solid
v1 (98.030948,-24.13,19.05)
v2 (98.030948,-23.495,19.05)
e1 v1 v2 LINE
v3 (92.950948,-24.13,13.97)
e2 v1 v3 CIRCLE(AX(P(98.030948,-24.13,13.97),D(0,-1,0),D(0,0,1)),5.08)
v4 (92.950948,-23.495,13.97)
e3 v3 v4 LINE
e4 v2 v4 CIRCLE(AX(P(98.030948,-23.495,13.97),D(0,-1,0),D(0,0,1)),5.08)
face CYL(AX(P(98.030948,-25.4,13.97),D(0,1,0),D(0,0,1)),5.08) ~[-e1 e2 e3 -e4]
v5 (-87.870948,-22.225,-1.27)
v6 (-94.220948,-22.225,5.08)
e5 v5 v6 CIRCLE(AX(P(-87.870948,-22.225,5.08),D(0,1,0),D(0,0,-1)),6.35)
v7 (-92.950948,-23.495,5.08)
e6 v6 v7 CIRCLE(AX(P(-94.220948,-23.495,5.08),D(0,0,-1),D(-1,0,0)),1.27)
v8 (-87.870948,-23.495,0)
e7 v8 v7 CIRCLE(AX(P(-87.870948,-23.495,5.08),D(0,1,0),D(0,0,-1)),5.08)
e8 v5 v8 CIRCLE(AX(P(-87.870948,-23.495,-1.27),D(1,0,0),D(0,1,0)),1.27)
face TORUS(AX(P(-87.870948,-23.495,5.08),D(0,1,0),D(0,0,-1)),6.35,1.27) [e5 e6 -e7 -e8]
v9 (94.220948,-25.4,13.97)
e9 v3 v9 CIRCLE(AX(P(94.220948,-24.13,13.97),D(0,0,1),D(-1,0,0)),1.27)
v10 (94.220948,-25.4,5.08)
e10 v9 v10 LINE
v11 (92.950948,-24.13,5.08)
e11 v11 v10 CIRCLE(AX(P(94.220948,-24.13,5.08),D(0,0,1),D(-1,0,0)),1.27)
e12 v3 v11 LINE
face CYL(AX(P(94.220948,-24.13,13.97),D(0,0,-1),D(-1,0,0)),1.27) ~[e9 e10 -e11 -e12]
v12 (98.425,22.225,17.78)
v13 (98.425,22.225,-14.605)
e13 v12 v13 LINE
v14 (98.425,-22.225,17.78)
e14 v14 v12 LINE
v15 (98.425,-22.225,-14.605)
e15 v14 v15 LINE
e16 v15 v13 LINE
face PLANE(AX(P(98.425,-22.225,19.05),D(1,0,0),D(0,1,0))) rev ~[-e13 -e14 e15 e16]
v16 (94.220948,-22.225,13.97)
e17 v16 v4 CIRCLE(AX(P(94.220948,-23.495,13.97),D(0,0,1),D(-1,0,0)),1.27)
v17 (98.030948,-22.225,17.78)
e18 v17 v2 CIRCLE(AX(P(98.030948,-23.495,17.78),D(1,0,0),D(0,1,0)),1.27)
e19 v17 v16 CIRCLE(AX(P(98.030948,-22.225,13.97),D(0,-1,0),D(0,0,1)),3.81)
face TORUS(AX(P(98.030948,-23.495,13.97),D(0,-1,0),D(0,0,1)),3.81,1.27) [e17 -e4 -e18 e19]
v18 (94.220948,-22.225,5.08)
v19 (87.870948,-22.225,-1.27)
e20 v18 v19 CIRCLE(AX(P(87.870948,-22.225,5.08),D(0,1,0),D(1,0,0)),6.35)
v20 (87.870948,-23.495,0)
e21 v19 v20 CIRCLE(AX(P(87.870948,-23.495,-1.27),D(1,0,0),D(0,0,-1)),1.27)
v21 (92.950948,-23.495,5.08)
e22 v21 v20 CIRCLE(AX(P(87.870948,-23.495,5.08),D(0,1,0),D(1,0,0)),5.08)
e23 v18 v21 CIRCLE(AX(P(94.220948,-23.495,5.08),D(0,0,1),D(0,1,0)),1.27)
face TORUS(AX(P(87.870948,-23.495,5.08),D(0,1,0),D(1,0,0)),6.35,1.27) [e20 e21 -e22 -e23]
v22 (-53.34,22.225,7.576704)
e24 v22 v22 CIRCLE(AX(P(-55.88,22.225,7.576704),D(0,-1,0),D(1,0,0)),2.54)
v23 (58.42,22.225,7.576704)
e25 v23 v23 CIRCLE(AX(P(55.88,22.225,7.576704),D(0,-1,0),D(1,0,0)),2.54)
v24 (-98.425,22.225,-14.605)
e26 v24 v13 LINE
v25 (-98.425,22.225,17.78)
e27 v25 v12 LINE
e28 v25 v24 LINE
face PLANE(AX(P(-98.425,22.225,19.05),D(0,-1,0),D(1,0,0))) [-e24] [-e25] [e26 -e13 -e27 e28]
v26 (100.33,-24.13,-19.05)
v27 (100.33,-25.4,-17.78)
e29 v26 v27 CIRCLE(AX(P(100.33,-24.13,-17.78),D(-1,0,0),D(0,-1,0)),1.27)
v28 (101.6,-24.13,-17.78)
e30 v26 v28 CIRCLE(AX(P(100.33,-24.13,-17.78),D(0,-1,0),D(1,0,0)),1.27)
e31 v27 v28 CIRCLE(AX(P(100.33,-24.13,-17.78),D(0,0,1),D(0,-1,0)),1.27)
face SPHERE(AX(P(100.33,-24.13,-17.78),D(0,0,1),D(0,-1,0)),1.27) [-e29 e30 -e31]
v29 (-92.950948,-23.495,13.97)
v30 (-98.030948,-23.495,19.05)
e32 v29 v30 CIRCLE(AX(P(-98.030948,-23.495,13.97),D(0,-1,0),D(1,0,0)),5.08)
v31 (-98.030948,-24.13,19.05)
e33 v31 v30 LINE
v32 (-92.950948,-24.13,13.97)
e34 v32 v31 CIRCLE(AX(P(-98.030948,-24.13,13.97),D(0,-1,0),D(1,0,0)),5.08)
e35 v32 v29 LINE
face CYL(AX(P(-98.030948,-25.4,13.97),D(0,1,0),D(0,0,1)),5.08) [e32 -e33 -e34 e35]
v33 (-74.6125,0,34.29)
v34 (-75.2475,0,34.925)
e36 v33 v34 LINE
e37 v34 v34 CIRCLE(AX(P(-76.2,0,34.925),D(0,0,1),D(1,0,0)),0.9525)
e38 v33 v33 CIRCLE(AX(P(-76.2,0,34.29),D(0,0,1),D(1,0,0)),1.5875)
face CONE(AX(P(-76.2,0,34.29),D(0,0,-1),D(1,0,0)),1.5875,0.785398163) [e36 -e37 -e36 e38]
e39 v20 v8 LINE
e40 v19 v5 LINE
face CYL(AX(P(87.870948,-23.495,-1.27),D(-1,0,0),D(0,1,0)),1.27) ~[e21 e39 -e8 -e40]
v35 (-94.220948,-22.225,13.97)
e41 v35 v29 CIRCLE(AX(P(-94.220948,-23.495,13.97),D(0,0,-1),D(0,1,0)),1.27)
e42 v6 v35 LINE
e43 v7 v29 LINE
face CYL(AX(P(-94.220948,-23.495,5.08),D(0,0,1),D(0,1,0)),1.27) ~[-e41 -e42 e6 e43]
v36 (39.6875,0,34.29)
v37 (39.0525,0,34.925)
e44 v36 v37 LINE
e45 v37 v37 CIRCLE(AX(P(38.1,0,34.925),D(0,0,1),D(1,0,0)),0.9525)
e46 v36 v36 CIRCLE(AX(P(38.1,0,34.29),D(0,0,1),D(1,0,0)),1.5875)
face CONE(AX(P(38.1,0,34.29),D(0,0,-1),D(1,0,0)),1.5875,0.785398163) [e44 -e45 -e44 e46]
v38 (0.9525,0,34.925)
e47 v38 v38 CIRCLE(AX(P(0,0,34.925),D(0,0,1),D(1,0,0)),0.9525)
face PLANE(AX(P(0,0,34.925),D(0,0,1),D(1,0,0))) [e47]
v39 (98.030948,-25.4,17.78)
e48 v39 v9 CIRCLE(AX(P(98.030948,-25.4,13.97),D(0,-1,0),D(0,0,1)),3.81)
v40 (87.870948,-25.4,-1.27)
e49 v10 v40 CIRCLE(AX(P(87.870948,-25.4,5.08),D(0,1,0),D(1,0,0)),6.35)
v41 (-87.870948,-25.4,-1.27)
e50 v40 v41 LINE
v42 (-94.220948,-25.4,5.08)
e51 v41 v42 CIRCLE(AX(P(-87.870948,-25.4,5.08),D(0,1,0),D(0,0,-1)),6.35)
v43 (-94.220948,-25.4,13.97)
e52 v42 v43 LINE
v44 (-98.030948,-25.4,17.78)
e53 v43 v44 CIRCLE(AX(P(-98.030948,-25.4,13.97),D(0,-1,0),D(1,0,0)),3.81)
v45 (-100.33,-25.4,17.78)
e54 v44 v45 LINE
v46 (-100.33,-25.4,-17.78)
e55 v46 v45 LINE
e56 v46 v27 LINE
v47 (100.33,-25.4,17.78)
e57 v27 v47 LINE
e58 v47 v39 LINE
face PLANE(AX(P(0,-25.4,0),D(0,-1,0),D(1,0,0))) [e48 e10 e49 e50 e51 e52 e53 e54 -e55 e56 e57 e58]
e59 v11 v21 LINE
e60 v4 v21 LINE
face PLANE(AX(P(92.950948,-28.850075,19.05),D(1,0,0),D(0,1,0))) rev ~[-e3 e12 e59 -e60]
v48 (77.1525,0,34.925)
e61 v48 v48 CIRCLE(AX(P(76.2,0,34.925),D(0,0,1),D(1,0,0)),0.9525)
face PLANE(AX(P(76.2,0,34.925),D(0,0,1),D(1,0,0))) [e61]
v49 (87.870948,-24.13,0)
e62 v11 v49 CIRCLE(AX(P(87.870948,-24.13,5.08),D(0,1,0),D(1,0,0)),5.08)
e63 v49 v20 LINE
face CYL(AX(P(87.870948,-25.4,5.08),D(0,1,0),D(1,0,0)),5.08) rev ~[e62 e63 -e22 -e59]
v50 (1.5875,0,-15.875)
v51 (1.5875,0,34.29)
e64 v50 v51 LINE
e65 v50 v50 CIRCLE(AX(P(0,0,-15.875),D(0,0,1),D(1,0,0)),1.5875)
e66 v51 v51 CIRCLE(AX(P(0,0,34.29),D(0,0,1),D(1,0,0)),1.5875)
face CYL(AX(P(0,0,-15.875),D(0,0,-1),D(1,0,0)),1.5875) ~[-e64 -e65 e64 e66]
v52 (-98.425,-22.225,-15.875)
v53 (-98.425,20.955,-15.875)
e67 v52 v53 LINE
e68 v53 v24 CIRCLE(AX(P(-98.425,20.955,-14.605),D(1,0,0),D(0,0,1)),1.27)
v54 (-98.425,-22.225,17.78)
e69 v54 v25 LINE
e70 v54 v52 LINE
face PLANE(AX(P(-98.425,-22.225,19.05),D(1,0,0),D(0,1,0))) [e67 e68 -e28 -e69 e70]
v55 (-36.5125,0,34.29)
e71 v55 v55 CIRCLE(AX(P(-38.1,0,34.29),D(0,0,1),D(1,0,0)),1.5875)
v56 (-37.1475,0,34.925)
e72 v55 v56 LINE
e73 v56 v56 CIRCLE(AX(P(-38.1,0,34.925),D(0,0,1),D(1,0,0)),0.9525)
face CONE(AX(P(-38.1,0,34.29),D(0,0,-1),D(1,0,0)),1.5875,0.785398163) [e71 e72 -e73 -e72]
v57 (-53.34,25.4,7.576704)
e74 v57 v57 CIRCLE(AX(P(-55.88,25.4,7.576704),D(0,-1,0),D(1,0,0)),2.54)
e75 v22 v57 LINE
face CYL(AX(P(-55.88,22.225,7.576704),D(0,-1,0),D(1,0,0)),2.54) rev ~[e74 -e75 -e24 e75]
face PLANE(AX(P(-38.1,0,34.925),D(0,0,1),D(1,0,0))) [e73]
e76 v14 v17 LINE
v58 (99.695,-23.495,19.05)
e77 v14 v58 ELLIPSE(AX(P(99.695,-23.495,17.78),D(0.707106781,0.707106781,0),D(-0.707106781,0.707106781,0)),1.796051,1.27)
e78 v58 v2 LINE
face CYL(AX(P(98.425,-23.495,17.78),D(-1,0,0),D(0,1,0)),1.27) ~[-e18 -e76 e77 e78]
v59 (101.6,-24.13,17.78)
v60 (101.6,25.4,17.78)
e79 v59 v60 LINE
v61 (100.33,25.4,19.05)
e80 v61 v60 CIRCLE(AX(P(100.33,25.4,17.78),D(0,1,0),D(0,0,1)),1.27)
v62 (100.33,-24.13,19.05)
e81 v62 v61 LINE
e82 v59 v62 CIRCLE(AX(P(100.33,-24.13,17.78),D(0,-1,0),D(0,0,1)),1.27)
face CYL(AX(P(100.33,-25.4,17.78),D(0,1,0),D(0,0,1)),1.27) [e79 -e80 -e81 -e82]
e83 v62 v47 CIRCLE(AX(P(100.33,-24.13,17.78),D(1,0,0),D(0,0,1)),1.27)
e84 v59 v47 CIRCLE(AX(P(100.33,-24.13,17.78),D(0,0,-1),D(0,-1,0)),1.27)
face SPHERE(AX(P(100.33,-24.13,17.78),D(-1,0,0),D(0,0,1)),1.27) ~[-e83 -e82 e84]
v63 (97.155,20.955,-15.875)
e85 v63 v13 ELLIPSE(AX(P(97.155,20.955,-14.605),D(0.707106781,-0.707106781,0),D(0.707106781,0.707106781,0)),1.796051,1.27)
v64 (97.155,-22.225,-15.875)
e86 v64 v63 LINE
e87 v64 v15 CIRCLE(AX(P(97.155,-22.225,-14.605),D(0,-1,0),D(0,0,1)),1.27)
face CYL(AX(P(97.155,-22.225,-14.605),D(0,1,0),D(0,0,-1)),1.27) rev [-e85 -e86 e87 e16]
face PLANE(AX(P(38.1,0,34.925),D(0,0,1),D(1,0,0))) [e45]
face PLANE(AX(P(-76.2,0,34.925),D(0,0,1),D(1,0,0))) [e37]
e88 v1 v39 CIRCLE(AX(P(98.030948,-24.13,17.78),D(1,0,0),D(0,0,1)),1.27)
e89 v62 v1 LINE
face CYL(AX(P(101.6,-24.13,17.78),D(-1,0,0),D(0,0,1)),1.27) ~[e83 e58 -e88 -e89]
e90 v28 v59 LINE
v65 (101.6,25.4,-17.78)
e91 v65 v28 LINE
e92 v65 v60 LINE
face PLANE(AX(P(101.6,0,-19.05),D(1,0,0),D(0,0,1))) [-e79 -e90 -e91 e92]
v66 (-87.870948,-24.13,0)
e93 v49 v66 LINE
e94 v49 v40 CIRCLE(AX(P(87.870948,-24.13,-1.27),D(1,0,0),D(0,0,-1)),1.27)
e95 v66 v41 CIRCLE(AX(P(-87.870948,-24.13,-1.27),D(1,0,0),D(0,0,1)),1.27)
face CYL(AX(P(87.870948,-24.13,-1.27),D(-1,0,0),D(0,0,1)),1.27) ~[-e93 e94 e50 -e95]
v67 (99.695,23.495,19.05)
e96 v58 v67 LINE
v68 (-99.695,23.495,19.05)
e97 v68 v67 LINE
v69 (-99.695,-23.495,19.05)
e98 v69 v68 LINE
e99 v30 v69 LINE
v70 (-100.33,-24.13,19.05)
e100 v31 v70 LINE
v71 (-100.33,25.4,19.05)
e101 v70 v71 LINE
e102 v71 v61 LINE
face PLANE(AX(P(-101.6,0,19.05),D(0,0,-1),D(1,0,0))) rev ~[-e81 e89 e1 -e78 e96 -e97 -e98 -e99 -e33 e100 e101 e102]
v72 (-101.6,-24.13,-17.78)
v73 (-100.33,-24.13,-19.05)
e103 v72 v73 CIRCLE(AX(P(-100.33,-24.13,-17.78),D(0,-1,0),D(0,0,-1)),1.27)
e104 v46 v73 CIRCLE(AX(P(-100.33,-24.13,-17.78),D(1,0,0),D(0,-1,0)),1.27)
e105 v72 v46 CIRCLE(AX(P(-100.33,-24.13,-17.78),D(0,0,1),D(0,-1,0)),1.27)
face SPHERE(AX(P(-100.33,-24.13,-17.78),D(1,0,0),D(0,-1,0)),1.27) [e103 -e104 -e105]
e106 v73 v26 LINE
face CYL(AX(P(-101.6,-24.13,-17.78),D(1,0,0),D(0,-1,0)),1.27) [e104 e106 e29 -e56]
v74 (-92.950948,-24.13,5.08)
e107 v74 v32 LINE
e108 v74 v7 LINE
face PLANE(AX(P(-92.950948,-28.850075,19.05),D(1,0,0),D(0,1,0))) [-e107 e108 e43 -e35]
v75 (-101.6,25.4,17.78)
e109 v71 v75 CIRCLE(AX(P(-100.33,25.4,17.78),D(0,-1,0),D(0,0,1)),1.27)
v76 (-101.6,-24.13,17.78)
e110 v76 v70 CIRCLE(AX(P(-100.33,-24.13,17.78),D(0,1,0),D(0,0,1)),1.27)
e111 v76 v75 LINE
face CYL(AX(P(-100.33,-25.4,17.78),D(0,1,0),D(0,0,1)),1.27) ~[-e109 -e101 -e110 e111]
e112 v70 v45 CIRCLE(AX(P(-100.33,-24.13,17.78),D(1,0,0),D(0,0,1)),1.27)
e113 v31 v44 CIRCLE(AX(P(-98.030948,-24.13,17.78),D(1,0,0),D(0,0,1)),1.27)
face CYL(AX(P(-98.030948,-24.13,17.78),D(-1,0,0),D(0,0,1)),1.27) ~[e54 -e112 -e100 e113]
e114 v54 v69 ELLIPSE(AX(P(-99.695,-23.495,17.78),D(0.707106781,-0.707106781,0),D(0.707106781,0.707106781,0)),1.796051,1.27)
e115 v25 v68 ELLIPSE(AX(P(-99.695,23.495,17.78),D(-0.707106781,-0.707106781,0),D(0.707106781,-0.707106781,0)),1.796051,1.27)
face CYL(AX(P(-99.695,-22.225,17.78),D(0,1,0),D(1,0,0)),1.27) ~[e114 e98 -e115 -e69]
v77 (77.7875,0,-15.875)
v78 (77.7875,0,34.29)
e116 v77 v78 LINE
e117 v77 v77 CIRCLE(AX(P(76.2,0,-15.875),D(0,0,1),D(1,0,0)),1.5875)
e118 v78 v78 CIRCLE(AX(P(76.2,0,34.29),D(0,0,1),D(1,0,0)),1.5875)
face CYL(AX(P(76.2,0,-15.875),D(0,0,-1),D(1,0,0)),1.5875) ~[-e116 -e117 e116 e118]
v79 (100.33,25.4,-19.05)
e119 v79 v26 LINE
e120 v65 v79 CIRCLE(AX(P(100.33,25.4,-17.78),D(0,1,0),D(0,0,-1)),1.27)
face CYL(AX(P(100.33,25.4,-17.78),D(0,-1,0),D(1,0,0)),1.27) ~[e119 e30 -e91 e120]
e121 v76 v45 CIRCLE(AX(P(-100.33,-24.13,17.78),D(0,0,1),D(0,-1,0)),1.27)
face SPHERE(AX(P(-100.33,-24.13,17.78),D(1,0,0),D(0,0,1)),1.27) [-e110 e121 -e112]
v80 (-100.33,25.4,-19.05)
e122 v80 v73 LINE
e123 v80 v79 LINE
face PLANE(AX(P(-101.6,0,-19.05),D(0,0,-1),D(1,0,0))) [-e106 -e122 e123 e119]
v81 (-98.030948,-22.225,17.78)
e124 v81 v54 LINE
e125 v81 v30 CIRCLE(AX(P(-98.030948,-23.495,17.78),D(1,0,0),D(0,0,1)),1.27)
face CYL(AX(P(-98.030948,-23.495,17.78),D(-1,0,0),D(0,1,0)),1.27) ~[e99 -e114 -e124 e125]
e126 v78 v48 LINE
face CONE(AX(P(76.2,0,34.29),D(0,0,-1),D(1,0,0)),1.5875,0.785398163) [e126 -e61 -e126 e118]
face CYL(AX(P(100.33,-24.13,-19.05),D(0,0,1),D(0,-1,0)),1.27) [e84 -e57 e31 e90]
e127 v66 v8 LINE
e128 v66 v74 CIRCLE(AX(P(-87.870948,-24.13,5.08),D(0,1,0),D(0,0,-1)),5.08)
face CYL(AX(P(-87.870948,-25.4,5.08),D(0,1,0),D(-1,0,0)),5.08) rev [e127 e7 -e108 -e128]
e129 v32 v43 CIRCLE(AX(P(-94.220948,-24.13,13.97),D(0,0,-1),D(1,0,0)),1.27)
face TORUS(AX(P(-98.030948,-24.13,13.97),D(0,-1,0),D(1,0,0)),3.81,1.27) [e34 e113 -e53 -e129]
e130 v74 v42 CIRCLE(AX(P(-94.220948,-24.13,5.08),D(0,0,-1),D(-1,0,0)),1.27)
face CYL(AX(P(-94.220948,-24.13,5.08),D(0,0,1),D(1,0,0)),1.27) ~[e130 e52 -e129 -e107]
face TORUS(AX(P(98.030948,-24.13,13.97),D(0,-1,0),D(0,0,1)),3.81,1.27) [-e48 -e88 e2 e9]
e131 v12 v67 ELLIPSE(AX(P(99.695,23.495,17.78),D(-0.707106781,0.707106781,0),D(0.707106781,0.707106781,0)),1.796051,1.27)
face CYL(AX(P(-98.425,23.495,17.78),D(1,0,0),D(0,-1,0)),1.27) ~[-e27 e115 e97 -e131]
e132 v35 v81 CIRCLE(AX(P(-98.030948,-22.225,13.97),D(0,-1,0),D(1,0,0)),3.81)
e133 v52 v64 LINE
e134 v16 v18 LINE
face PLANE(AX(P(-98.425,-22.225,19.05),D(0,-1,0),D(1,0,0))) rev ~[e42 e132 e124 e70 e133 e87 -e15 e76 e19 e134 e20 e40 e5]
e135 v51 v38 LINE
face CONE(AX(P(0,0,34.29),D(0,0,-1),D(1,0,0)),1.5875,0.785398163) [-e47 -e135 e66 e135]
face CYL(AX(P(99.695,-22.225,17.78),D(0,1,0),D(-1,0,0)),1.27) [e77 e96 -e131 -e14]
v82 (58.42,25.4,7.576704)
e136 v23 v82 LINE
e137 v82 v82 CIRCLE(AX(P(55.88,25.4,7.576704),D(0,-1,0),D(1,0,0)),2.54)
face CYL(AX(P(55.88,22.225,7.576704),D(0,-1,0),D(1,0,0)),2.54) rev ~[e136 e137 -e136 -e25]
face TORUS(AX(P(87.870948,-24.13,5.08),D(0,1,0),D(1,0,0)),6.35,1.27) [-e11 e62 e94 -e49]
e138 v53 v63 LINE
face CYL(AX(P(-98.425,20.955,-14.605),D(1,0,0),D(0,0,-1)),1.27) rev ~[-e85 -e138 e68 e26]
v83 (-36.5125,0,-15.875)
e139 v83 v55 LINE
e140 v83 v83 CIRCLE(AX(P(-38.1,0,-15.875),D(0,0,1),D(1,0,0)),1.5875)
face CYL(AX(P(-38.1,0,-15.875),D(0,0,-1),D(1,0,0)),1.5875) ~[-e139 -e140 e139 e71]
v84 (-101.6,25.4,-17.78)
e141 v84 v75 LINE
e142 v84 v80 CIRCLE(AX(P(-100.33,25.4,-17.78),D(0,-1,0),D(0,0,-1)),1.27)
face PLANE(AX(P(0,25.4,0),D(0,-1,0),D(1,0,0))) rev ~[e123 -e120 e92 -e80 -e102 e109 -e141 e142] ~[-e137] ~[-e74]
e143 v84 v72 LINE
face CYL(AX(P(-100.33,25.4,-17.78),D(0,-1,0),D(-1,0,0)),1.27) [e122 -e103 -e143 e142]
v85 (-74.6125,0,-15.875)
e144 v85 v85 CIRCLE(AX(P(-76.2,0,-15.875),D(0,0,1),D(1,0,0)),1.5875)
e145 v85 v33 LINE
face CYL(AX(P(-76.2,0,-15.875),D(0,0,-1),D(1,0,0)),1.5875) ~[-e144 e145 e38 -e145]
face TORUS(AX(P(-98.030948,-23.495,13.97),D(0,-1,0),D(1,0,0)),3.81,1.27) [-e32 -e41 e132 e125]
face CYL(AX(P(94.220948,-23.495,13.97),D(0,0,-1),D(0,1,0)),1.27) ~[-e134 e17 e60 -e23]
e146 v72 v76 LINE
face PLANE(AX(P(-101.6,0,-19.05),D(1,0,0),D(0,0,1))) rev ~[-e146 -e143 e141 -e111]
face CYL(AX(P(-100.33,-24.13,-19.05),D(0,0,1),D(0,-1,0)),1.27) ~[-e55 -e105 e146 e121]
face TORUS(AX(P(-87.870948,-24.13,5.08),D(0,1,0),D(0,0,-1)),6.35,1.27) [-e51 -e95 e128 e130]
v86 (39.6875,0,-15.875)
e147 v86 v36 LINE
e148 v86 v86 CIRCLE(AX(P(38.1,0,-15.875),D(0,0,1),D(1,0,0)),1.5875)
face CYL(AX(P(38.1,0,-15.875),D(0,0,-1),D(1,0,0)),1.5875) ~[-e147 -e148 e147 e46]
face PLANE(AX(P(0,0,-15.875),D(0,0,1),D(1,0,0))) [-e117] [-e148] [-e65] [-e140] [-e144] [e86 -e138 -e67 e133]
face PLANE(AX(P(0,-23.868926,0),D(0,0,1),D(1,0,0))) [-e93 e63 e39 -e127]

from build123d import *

# Parameters (mm, degrees)
F0_W      = 203.2
F0_H      = 38.1
F1_DEPTH  = 25.4
F2_W      = 196.85
F2_H      = 44.45
F3_DEPTH  = 34.925
F4_R      = 1.5875
F5_DEPTH  = 50.8
F6_W      = 185.9018951654
F6_H      = 9.962297976
F7_DEPTH  = 19.05
F8_R      = 5.08
F9_SIZE   = 0.635
F10_R     = 1.27
F11_R     = 2.54
F12_DEPTH = 5.08


with BuildPart() as f1:
    # F0 (on Front) → F1 (new body, symmetric)
    with BuildSketch(Plane.XZ):
        Rectangle(F0_W, F0_H)
    extrude(amount=F1_DEPTH, both=True)

    # F2 (on face) → F3 (cut)
    with BuildSketch(Plane.XY.offset(19.05)):
        Rectangle(F2_W, F2_H)
    extrude(amount=-F3_DEPTH, mode=Mode.SUBTRACT)

    # F4 (on face) → F5 (join)
    with BuildSketch(Plane.XY.offset(-15.875)):
        Circle(F4_R)
        with Locations((-38.1, 0)):
            Circle(F4_R)
        with Locations((-76.2, 0)):
            Circle(F4_R)
        with Locations((38.1, 0)):
            Circle(F4_R)
        with Locations((76.2, 0)):
            Circle(F4_R)
    extrude(amount=F5_DEPTH)

    # F6 (on face) → F7 (cut)
    with BuildSketch(Plane.XY.offset(19.05)):
        with Locations((0, -23.8689258695)):
            Rectangle(F6_W, F6_H)
    extrude(amount=-F7_DEPTH, mode=Mode.SUBTRACT)

    # F8
    f8_edges = [f1.edges().sort_by_distance(p)[0] for p in [
        (-92.950948, -23.8125, 19.05),
        (-92.950948, -23.8125, 0),
        (92.950948, -23.8125, 19.05),
        (92.950948, -23.8125, 0),
    ]]
    fillet(f8_edges, radius=F8_R)

    # F9
    f9_edges = [f1.edges().sort_by_distance(p)[0] for p in [
        (-1.5875, 0, 34.925),
        (-39.6875, 0, 34.925),
        (36.5125, 0, 34.925),
        (74.6125, 0, 34.925),
        (-77.7875, 0, 34.925),
    ]]
    chamfer(f9_edges, length=F9_SIZE)

    # F10
    f10_edges = [f1.edges().sort_by_distance(p)[0] for p in [
        (0, 22.225, 19.05),
        (-98.425, 0, 19.05),
        (0, -25.4, 0),
        (-91.46305, -25.4, 1.487898),
        (-92.950948, -25.4, 9.525),
        (-99.815474, -25.4, 19.05),
        (-101.6, 0, 19.05),
        (101.6, 0, 19.05),
        (101.6, -25.4, 0),
        (0, -25.4, -19.05),
        (101.6, 0, -19.05),
        (-101.6, -25.4, 0),
        (-101.6, 0, -19.05),
        (0, 22.225, -15.875),
        (0, -22.225, 0),
        (98.425, 0, 19.05),
        (98.425, 0, -15.875),
    ]]
    fillet(f10_edges, radius=F10_R)

    # F11 (on face) → F12 (cut)
    with BuildSketch(Plane.XZ.offset(-22.225)):
        with Locations((55.88, 7.5767044909)):
            Circle(F11_R)
        with Locations((-55.88, 7.5767044909)):
            Circle(F11_R)
    extrude(amount=-F12_DEPTH, mode=Mode.SUBTRACT)


solid = f1.part
